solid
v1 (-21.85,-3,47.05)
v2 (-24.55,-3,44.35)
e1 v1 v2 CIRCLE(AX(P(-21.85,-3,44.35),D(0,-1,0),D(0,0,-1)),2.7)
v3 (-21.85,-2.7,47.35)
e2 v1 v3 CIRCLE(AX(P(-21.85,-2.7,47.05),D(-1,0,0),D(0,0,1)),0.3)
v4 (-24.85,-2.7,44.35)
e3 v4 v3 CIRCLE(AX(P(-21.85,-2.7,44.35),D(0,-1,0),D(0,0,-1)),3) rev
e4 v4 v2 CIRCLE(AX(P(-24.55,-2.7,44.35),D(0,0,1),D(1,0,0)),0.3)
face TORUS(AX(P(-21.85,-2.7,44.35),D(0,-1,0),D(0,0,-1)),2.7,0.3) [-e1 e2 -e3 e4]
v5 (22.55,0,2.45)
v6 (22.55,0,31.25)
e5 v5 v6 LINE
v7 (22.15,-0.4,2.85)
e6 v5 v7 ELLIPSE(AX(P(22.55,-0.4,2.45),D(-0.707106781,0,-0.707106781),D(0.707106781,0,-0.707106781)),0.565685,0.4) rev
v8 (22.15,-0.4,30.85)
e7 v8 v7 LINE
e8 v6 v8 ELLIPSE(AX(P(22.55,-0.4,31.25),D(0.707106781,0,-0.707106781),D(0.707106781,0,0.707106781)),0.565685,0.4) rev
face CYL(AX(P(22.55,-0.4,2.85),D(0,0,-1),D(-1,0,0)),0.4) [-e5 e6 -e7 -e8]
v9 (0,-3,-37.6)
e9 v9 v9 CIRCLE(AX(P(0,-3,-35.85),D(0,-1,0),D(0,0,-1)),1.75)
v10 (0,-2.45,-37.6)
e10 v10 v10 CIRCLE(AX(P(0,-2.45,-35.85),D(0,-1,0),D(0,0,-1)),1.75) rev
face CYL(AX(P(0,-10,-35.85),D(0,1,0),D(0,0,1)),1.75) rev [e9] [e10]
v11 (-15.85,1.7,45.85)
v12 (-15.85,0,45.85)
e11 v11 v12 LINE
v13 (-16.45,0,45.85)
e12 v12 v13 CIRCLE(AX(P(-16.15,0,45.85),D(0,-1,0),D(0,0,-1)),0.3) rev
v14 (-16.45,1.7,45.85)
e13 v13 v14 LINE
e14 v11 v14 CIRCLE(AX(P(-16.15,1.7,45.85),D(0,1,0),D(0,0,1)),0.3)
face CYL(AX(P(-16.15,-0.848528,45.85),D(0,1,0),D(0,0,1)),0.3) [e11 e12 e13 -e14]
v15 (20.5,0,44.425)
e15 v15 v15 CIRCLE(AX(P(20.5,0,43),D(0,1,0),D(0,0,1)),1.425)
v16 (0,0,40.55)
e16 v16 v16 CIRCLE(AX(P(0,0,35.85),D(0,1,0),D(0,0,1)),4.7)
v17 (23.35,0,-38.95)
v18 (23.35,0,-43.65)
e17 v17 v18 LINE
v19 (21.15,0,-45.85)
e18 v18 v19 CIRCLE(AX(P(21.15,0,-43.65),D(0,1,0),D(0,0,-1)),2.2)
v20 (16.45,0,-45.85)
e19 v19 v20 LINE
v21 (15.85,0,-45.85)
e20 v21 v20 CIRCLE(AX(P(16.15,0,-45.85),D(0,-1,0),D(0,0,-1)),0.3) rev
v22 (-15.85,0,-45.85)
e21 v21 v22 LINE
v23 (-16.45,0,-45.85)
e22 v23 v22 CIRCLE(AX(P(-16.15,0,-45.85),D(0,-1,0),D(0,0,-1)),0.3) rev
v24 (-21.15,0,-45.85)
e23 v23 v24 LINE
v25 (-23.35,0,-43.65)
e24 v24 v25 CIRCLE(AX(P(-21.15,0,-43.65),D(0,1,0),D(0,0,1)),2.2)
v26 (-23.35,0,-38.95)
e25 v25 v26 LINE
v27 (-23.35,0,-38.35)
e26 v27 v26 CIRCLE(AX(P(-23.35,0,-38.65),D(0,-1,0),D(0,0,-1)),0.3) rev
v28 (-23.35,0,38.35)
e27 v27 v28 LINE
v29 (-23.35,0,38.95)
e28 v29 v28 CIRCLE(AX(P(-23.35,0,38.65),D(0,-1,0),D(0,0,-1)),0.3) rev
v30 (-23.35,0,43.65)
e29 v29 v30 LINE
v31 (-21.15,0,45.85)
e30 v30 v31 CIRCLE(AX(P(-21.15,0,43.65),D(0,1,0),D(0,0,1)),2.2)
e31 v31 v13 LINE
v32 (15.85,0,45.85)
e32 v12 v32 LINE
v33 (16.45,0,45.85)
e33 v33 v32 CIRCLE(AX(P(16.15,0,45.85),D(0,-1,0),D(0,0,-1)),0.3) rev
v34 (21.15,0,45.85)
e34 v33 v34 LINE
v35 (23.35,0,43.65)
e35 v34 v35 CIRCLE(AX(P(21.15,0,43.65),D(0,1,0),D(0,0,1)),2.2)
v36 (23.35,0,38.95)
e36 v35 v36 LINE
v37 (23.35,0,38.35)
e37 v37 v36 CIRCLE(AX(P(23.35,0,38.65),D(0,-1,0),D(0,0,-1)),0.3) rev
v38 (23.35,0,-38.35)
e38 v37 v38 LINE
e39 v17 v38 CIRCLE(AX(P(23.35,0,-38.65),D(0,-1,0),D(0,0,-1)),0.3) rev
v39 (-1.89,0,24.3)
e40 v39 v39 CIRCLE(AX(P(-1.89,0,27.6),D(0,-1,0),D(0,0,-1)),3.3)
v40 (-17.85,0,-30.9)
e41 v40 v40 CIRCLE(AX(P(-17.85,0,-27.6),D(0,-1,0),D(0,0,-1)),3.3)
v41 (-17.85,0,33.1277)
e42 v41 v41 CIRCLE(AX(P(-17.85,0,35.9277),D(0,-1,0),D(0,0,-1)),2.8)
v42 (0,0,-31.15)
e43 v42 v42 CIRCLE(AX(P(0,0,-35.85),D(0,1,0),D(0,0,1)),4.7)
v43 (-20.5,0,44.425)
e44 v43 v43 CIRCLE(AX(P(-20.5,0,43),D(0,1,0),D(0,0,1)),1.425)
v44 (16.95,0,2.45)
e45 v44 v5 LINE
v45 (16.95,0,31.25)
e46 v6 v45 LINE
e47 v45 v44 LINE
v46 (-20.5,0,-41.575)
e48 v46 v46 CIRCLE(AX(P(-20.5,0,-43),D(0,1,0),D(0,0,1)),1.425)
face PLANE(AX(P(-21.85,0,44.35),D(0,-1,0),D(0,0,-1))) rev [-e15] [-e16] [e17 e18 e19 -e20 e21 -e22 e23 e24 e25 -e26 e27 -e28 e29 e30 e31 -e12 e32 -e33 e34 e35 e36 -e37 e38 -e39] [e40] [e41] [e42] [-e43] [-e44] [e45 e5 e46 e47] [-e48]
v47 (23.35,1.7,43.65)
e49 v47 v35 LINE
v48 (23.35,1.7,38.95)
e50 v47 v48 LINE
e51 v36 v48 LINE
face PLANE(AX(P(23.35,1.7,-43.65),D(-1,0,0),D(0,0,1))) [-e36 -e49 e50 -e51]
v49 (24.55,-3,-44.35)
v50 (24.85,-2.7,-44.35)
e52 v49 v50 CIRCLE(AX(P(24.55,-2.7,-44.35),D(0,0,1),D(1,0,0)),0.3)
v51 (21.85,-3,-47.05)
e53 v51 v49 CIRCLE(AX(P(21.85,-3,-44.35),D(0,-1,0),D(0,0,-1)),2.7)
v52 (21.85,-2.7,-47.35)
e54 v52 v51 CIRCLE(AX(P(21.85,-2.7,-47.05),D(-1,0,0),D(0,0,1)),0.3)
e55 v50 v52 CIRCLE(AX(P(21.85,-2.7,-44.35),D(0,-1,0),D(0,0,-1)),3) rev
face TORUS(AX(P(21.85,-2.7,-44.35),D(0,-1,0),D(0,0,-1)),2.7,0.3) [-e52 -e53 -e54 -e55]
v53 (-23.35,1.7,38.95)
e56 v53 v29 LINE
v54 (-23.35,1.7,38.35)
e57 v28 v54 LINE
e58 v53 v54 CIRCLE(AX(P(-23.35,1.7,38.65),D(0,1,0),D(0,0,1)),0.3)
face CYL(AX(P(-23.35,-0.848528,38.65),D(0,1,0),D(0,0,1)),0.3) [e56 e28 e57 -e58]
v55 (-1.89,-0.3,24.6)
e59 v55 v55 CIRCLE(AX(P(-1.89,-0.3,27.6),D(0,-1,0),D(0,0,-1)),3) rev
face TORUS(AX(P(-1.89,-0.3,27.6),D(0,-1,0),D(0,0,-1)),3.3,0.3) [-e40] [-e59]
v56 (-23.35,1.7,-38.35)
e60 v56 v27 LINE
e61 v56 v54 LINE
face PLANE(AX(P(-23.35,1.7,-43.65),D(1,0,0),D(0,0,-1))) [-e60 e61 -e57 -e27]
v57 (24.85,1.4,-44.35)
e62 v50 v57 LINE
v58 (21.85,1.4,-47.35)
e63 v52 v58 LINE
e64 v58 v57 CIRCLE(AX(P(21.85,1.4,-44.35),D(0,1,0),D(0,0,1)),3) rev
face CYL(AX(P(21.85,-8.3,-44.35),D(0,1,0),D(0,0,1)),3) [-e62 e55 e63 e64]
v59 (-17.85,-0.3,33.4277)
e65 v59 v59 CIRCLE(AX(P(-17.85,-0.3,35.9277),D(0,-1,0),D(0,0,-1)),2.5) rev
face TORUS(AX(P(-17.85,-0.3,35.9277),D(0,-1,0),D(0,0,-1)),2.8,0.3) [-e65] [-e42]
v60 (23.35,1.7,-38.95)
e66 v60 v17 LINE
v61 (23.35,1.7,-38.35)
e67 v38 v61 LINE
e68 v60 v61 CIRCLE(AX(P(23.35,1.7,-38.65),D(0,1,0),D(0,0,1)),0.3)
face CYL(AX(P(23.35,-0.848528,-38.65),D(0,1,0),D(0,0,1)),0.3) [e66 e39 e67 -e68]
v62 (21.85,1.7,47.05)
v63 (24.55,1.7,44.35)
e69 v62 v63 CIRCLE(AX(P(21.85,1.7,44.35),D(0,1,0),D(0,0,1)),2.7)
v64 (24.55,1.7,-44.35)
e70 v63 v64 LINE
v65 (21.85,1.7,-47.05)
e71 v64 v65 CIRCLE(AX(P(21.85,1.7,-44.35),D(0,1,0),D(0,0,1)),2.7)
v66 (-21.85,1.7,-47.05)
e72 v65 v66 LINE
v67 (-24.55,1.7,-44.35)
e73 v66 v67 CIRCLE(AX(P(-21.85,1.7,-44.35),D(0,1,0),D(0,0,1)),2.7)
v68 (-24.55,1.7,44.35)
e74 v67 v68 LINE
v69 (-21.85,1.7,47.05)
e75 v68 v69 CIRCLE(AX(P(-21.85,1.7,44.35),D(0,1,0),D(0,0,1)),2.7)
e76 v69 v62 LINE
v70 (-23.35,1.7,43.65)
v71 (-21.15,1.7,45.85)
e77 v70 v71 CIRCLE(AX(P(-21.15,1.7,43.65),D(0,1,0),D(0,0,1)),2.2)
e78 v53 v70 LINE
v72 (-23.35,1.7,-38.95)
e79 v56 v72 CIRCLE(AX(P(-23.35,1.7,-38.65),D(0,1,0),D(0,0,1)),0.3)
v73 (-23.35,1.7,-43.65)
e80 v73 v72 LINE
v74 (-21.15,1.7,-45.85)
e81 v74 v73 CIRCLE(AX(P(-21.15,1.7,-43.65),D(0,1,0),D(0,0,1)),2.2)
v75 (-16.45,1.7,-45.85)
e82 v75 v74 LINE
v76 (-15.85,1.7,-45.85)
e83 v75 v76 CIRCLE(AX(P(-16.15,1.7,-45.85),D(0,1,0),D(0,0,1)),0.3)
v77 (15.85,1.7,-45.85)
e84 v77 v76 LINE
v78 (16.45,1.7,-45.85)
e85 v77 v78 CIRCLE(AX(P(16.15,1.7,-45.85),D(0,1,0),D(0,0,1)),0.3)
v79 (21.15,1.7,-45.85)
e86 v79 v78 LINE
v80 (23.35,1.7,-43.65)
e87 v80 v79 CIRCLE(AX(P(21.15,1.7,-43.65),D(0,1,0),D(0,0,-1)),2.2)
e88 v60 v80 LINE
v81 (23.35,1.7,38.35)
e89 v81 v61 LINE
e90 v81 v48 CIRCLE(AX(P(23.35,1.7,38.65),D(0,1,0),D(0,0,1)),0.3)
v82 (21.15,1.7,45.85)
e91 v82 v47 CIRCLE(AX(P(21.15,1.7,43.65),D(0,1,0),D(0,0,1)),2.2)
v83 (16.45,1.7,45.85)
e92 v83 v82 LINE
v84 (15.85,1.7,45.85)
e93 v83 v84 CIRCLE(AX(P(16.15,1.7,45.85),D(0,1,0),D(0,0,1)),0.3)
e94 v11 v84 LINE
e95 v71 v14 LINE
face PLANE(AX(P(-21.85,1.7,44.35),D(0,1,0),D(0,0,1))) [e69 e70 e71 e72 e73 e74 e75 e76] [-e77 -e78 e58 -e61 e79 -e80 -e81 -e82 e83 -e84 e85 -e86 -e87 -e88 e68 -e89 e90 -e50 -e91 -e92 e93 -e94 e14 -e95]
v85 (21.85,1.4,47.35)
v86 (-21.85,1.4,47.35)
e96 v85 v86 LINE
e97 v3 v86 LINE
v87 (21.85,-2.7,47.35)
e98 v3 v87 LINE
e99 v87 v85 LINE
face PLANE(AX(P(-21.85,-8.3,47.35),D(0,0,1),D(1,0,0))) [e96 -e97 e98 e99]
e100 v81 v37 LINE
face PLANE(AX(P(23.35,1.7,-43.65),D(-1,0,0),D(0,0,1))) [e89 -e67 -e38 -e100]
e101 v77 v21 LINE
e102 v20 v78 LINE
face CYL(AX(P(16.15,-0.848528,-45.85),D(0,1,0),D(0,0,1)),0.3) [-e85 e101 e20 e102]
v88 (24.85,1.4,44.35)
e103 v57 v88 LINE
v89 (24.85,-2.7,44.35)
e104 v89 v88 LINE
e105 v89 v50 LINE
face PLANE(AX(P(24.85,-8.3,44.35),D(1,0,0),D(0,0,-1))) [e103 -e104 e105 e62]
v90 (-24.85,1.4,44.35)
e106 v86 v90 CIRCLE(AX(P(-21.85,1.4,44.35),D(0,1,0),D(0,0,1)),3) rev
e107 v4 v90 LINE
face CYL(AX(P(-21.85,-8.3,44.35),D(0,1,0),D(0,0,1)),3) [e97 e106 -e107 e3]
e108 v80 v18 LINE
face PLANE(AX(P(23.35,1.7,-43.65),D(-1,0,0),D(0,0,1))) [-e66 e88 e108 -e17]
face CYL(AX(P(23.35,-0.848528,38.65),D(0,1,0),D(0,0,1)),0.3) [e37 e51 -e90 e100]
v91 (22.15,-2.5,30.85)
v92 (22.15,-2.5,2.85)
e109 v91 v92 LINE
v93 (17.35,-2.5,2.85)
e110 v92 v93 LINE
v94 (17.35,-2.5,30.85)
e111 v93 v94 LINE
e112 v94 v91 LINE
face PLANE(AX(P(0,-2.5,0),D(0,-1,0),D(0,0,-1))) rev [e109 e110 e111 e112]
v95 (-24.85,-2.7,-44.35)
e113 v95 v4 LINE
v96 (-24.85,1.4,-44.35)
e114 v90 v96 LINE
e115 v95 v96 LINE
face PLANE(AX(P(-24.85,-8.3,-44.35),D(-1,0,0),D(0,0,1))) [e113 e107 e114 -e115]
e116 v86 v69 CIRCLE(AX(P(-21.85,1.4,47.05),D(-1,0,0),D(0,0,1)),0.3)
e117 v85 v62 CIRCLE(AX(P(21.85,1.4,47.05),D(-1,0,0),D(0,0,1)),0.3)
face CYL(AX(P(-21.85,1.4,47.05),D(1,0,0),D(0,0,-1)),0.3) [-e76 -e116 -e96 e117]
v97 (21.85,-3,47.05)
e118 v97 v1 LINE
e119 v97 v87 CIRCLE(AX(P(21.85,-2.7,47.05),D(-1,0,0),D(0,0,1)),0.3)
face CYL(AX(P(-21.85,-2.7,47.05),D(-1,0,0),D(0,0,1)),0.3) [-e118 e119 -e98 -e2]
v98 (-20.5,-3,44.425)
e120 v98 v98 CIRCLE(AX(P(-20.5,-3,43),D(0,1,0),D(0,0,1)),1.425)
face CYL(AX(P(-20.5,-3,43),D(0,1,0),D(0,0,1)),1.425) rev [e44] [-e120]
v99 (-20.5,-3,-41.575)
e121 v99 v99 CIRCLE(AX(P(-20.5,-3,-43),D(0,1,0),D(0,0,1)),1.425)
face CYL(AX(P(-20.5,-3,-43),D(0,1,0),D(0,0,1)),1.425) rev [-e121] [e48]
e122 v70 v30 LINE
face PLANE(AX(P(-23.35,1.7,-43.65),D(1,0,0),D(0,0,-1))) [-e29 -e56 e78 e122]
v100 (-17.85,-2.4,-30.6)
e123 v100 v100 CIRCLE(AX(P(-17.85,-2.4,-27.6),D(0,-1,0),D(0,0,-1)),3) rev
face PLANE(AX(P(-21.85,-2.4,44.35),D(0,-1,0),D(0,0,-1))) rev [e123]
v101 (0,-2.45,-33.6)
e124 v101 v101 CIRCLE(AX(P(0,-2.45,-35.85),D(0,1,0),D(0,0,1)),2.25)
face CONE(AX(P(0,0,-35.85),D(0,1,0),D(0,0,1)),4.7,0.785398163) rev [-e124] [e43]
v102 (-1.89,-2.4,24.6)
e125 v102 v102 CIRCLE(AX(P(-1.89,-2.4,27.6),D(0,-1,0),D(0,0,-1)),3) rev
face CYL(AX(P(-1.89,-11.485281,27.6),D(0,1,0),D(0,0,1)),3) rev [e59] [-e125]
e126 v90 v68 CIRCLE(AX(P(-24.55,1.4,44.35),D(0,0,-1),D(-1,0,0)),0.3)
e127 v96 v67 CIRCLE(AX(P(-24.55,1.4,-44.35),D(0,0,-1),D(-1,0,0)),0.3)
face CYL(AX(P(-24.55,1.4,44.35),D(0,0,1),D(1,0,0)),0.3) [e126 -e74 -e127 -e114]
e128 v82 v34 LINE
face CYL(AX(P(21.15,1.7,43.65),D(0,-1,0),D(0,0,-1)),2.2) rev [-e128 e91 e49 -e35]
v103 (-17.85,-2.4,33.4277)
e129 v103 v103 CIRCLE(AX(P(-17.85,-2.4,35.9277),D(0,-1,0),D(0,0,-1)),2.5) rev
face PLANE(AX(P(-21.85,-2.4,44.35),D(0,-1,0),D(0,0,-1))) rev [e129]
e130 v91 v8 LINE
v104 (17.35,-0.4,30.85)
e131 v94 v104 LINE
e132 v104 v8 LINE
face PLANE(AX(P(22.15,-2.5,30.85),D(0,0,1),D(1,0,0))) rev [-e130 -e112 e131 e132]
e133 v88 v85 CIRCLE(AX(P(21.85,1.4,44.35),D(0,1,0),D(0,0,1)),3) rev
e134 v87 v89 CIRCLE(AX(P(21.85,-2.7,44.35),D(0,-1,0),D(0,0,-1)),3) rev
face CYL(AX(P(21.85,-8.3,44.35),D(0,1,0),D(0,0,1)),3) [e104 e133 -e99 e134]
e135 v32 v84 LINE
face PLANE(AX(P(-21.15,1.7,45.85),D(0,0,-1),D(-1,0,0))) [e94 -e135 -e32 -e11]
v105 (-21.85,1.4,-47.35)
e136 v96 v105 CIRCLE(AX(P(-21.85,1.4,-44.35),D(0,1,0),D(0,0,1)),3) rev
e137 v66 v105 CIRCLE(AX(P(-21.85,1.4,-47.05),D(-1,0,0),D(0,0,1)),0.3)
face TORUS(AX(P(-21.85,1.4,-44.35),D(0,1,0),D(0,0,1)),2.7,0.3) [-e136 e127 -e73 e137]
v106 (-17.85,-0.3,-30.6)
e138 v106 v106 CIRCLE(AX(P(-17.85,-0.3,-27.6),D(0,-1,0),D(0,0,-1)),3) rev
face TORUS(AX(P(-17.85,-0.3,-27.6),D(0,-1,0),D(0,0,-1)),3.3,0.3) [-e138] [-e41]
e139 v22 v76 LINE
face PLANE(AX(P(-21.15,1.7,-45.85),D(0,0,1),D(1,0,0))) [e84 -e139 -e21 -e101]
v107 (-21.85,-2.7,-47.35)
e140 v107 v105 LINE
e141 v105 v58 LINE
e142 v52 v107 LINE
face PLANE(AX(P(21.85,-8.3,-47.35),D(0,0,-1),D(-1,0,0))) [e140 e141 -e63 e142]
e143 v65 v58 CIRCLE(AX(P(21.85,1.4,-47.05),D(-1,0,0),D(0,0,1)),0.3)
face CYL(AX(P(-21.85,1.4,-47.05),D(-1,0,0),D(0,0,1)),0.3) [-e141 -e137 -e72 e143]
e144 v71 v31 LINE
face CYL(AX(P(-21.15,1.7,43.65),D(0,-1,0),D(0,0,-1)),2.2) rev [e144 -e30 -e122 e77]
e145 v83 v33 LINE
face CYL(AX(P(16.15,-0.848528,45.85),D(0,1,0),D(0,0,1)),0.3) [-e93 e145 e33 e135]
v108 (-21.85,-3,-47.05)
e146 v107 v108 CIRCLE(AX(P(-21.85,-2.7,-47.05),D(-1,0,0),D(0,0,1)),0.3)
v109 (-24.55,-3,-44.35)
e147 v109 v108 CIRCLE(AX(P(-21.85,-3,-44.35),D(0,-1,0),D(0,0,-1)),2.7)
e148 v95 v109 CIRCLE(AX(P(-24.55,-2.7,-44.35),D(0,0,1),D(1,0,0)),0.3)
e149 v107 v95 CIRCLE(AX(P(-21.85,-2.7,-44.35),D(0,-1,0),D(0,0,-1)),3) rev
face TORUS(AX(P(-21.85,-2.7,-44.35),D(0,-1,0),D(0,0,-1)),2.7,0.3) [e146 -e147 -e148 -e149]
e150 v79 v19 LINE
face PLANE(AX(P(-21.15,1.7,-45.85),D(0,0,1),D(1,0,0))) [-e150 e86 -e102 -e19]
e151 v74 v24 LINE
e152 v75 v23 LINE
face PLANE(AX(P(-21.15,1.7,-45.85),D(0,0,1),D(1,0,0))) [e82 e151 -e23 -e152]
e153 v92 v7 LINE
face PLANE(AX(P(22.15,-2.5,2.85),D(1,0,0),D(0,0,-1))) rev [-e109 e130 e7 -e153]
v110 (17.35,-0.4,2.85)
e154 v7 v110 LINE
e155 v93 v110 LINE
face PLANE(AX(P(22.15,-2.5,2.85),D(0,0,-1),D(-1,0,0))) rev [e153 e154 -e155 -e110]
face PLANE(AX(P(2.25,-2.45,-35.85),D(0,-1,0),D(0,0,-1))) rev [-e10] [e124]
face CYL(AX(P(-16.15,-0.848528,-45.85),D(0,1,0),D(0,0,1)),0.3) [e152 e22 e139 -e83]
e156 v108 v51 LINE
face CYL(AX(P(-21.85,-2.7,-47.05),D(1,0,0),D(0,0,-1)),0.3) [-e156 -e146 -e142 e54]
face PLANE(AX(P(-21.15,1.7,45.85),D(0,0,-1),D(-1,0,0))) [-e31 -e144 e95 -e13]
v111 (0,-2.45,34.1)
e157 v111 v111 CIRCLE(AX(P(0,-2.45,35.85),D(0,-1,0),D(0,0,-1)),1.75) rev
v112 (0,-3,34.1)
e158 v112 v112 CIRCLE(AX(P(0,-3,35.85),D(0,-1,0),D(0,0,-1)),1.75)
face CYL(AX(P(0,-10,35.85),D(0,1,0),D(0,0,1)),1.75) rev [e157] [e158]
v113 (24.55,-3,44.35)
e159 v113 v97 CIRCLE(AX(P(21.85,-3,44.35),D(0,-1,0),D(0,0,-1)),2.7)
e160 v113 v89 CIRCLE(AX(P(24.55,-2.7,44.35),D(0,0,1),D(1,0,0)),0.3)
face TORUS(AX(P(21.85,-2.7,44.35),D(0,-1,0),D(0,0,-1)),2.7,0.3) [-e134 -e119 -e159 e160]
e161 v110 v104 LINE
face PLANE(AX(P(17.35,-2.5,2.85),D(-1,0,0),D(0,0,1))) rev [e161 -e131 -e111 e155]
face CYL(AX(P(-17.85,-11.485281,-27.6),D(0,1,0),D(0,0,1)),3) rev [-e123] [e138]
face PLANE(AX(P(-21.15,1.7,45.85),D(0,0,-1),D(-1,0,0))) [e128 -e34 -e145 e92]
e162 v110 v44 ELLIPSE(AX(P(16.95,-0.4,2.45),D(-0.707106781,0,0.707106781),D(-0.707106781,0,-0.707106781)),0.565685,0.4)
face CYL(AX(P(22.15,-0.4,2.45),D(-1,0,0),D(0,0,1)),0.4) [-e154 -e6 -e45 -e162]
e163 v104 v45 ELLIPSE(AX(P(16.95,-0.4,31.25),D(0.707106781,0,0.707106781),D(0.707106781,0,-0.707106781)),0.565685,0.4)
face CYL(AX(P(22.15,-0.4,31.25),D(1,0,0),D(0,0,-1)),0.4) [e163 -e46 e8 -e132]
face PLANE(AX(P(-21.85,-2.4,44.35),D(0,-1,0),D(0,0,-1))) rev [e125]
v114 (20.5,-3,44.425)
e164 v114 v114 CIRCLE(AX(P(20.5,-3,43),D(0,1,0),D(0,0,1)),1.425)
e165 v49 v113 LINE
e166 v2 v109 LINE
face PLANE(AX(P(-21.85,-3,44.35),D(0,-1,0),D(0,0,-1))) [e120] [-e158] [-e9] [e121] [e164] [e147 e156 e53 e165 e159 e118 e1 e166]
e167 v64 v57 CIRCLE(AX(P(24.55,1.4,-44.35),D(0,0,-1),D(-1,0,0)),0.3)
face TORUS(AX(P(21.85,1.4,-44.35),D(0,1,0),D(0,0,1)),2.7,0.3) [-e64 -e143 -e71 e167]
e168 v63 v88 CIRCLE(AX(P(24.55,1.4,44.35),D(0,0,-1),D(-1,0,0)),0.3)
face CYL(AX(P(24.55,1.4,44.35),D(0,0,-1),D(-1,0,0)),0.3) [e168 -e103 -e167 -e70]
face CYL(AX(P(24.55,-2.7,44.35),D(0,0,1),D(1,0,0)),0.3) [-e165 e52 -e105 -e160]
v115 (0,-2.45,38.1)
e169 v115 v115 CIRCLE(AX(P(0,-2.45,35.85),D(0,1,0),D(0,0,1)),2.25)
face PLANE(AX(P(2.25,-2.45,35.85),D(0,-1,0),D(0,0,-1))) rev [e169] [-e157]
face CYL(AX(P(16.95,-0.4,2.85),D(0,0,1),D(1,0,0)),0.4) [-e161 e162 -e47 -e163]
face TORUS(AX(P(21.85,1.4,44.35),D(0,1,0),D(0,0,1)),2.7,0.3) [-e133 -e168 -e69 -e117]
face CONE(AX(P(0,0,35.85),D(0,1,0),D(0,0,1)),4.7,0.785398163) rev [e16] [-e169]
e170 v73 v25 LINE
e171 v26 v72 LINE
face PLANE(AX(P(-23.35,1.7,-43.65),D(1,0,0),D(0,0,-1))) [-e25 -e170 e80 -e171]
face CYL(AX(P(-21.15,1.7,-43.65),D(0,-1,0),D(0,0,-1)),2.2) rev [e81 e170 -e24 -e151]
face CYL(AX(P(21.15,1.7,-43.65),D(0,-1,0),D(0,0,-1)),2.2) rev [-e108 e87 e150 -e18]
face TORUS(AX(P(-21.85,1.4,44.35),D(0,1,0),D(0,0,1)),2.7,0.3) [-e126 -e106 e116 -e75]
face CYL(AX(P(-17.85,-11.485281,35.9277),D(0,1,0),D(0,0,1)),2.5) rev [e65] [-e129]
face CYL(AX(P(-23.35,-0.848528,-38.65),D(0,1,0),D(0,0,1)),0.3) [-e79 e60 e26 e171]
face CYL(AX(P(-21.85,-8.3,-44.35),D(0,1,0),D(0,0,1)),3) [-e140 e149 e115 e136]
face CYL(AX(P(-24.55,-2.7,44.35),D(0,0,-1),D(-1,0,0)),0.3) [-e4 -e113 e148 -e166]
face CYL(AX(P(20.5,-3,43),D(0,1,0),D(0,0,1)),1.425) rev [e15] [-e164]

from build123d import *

# Parameters (mm, degrees)
BOSS_EXTRUDE1_DEPTH         = 1.7
BOSS_EXTRUDE2_START         = 3
BOSS_EXTRUDE2_DEPTH         = 3
SKETCH8_W                   = 4.8
SKETCH8_H                   = 28
CUT_EXTRUDE1_DEPTH          = 2.5
FILLET4_R                   = 0.2
FILLET5_R                   = 0.4
SKETCH9_W                   = 86.507832479
SKETCH9_H                   = 115.776512498
CUT_EXTRUDE2_DEPTH          = 10
SKETCH10_R                  = 1.425
CUT_EXTRUDE3_DEPTH          = 54.558799464
SKETCH11_R                  = 1.75
CUT_EXTRUDE4_DEPTH          = 10
ADVANCEDHOLE2_OUTLINE_R     = 2.25
ADVANCEDHOLE2_OUTLINE_R_2   = 1.75
ADVANCEDHOLE2_DEPTH         = 2.45
ADVANCEDHOLE2_DRAFT         = -45
ADVANCEDHOLE2_2_OUTLINE_R   = 2.25
ADVANCEDHOLE2_2_OUTLINE_R_2 = 1.75
ADVANCEDHOLE2_2_DEPTH       = 2.45
ADVANCEDHOLE2_2_DRAFT       = -45
SKETCH15_R                  = 0.3
BOSS_EXTRUDE3_DEPTH         = 1.7
FILLET6_R                   = 0.3
SKETCH16_R                  = 3
SKETCH16_R_2                = 2.5
CUT_EXTRUDE5_DEPTH          = 2.4
FILLET7_R                   = 0.3


# Read off the part's stored shape, not the designer's step: AdvancedHole2
with BuildPart() as part:
    # Sketch1 → Boss-Extrude1 (new body)
    with BuildSketch(Plane(origin=(0, 0, 0), x_dir=(1, 0, 0), z_dir=(0, 1, 0))):
        with BuildLine():
            Line((-21.85, 48.35), (21.85, 48.35))
            ThreePointArc((21.85, 48.35), (24.678427125, 47.178427125), (25.85, 44.35))
            Line((25.85, 44.35), (25.85, -44.35))
            ThreePointArc((25.85, -44.35), (24.678427125, -47.178427125), (21.85, -48.35))
            Line((21.85, -48.35), (-21.85, -48.35))
            ThreePointArc((-21.85, -48.35), (-24.678427125, -47.178427125), (-25.85, -44.35))
            Line((-25.85, -44.35), (-25.85, 44.35))
            ThreePointArc((-25.85, 44.35), (-24.678427125, 47.178427125), (-21.85, 48.35))
        make_face()
        with BuildLine():
            Line((-21.15, 45.85), (21.15, 45.85))
            ThreePointArc((21.15, 45.85), (22.705634919, 45.205634919), (23.35, 43.65))
            Line((23.35, 43.65), (23.35, -43.65))
            ThreePointArc((23.35, -43.65), (22.705634919, -45.205634919), (21.15, -45.85))
            Line((21.15, -45.85), (-21.15, -45.85))
            ThreePointArc((-21.15, -45.85), (-22.705634919, -45.205634919), (-23.35, -43.65))
            Line((-23.35, -43.65), (-23.35, 43.65))
            ThreePointArc((-23.35, 43.65), (-22.705634919, 45.205634919), (-21.15, 45.85))
        make_face(mode=Mode.SUBTRACT)
    extrude(amount=BOSS_EXTRUDE1_DEPTH)

    # Sketch2 → Boss-Extrude2 (add)
    with BuildSketch(Plane.XZ.offset(BOSS_EXTRUDE2_START)):
        with BuildLine():
            Line((-25.85, 44.35), (-25.85, -44.35))
            ThreePointArc((-25.85, -44.35), (-24.678427125, -47.178427125), (-21.85, -48.35))
            Line((-21.85, -48.35), (21.85, -48.35))
            ThreePointArc((21.85, -48.35), (24.678427125, -47.178427125), (25.85, -44.35))
            Line((25.85, -44.35), (25.85, 44.35))
            ThreePointArc((25.85, 44.35), (24.678427125, 47.178427125), (21.85, 48.35))
            Line((21.85, 48.35), (-21.85, 48.35))
            ThreePointArc((-21.85, 48.35), (-24.678427125, 47.178427125), (-25.85, 44.35))
        make_face()
    extrude(amount=-BOSS_EXTRUDE2_DEPTH)

    # Sketch8 → Cut-Extrude1 (cut)
    with BuildSketch(Plane(origin=(0, 0, 0), x_dir=(1, 0, 0), z_dir=(0, 1, 0))):
        with Locations((19.75, -16.85)):
            Rectangle(SKETCH8_W, SKETCH8_H)
    extrude(amount=-CUT_EXTRUDE1_DEPTH, mode=Mode.SUBTRACT)

    # Fillet4
    fillet4_edges = [part.edges().sort_by_distance(p)[0] for p in [
        (-24.678427125, -3, 47.178427125),
        (-25.85, -3, 0),
        (-24.678427125, -3, -47.178427125),
        (0, -3, -48.35),
        (24.678427125, -3, -47.178427125),
        (25.85, -3, 0),
        (24.678427125, -3, 47.178427125),
        (0, -3, 48.35),
    ]]
    fillet(fillet4_edges, radius=FILLET4_R)

    # Fillet5
    fillet5_edges = [part.edges().sort_by_distance(p)[0] for p in [
        (22.15, 0, 16.85),
        (19.75, 0, 2.85),
        (17.35, 0, 16.85),
        (19.75, 0, 30.85),
    ]]
    fillet(fillet5_edges, radius=FILLET5_R)

    # Sketch9 → Cut-Extrude2 (cut)
    with BuildSketch(Plane(origin=(0, 1.7, 0), x_dir=(1, 0, 0), z_dir=(0, 1, 0))):
        with Locations((1.136314031, 0.63119656)):
            Rectangle(SKETCH9_W, SKETCH9_H)
        with BuildLine():
            Line((-21.85, -47.35), (21.85, -47.35))
            ThreePointArc((21.85, -47.35), (23.971320344, -46.471320344), (24.85, -44.35))
            Line((24.85, -44.35), (24.85, 44.35))
            ThreePointArc((24.85, 44.35), (23.971320344, 46.471320344), (21.85, 47.35))
            Line((21.85, 47.35), (-21.85, 47.35))
            ThreePointArc((-21.85, 47.35), (-23.971320344, 46.471320344), (-24.85, 44.35))
            Line((-24.85, 44.35), (-24.85, -44.35))
            ThreePointArc((-24.85, -44.35), (-23.971320344, -46.471320344), (-21.85, -47.35))
        make_face(mode=Mode.SUBTRACT)
    extrude(amount=-CUT_EXTRUDE2_DEPTH, mode=Mode.SUBTRACT)

    # Sketch10 → Cut-Extrude3 (cut, through all)
    with BuildSketch(Plane(origin=(0, 0, 0), x_dir=(1, 0, 0), z_dir=(0, 1, 0))):
        with Locations(Location((-20.5, 43, 0), (0, 0, 270))):
            Circle(SKETCH10_R)
        with Locations(Location((-20.5, -43, 0), (0, 0, 270))):
            Circle(SKETCH10_R)
        with Locations(Location((20.5, -43, 0), (0, 0, 270))):
            Circle(SKETCH10_R)
    extrude(amount=-CUT_EXTRUDE3_DEPTH, mode=Mode.SUBTRACT)

    # Sketch11 → Cut-Extrude4 (cut)
    with BuildSketch(Plane(origin=(0, 0, 0), x_dir=(1, 0, 0), z_dir=(0, 1, 0))):
        with Locations(Location((0, 35.85, 0), (0, 0, 270))):
            Circle(SKETCH11_R)
        with Locations(Location((0, -35.85, 0), (0, 0, 270))):
            Circle(SKETCH11_R)
    extrude(amount=-CUT_EXTRUDE4_DEPTH, mode=Mode.SUBTRACT)


with BuildPart() as advancedhole2_tool:
    # AdvancedHole2 outline → AdvancedHole2 (with draft: the straight prism first)
    with BuildSketch(Plane(origin=(0, -2.45, 0), x_dir=(1, 0, 0), z_dir=(0, 1, 0))):
        with Locations((0, -35.85)):
            Circle(ADVANCEDHOLE2_OUTLINE_R)
        with Locations((0, -35.85)):
            Circle(ADVANCEDHOLE2_OUTLINE_R_2, mode=Mode.SUBTRACT)
    extrude(amount=ADVANCEDHOLE2_DEPTH)
    # AdvancedHole2: the draft: its side faces are tilted about the plane it starts from
    advancedhole2_sides = [advancedhole2_tool.faces().sort_by_distance(p)[0] for p in [
        (-2.25, -1.225, 35.85),
        (-1.75, -1.225, 35.85),
    ]]
    draft(advancedhole2_sides, Plane(origin=(0, -2.45, 0), x_dir=(1, 0, 0), z_dir=(0, 1, 0)), ADVANCEDHOLE2_DRAFT)


with BuildPart() as part_1:
    add(part.part)

    # AdvancedHole2: cut by advancedhole2_tool
    add(advancedhole2_tool.part, mode=Mode.SUBTRACT)


with BuildPart() as advancedhole2_2_tool:
    # AdvancedHole2 2 outline → AdvancedHole2 2 (with draft: the straight prism first)
    with BuildSketch(Plane(origin=(0, -2.45, 0), x_dir=(1, 0, 0), z_dir=(0, 1, 0))):
        with Locations((0, 35.85)):
            Circle(ADVANCEDHOLE2_2_OUTLINE_R)
        with Locations((0, 35.85)):
            Circle(ADVANCEDHOLE2_2_OUTLINE_R_2, mode=Mode.SUBTRACT)
    extrude(amount=ADVANCEDHOLE2_2_DEPTH)
    # AdvancedHole2 2: the draft: its side faces are tilted about the plane it starts from
    advancedhole2_2_sides = [advancedhole2_2_tool.faces().sort_by_distance(p)[0] for p in [
        (-2.25, -1.225, -35.85),
        (-1.75, -1.225, -35.85),
    ]]
    draft(advancedhole2_2_sides, Plane(origin=(0, -2.45, 0), x_dir=(1, 0, 0), z_dir=(0, 1, 0)), ADVANCEDHOLE2_2_DRAFT)


with BuildPart() as part_2:
    add(part_1.part)

    # AdvancedHole2 2: cut by advancedhole2_2_tool
    add(advancedhole2_2_tool.part, mode=Mode.SUBTRACT)

    # Sketch15 → Boss-Extrude3 (add)
    with BuildSketch(Plane(origin=(0, 1.7, 0), x_dir=(1, 0, 0), z_dir=(0, 1, 0))):
        with Locations((-23.35, -38.65)):
            Circle(SKETCH15_R)
        with Locations((-16.15, -45.85)):
            Circle(SKETCH15_R)
        with Locations((16.15, -45.85)):
            Circle(SKETCH15_R)
        with Locations((23.35, -38.65)):
            Circle(SKETCH15_R)
        with Locations((-23.35, 38.65)):
            Circle(SKETCH15_R)
        with Locations((-16.15, 45.85)):
            Circle(SKETCH15_R)
        with Locations((16.15, 45.85)):
            Circle(SKETCH15_R)
        with Locations((23.35, 38.65)):
            Circle(SKETCH15_R)
    extrude(amount=-BOSS_EXTRUDE3_DEPTH)

    # Fillet6
    fillet6_edges = [part_2.edges().sort_by_distance(p)[0] for p in [
        (0, -3, 47.35),
        (23.971320344, -3, 46.471320344),
        (24.85, -3, 0),
        (23.971320344, -3, -46.471320344),
        (0, -3, -47.35),
        (-23.971320344, -3, -46.471320344),
        (-24.85, -3, 0),
        (-23.971320344, -3, 46.471320344),
        (-23.971320344, 1.7, 46.471320344),
        (-24.85, 1.7, 0),
        (-23.971320344, 1.7, -46.471320344),
        (0, 1.7, -47.35),
        (23.971320344, 1.7, -46.471320344),
        (24.85, 1.7, 0),
        (23.971320344, 1.7, 46.471320344),
        (0, 1.7, 47.35),
    ]]
    fillet(fillet6_edges, radius=FILLET6_R)

    # Sketch16 → Cut-Extrude5 (cut)
    with BuildSketch(Plane(origin=(0, 0, 0), x_dir=(1, 0, 0), z_dir=(0, 1, 0))):
        with Locations(Location((-17.85, 27.6, 0), (0, 0, 270))):
            Circle(SKETCH16_R)
        with Locations(Location((-17.85, -35.9277, 0), (0, 0, 270))):
            Circle(SKETCH16_R_2)
        with Locations(Location((-1.89, -27.6, 0), (0, 0, 270))):
            Circle(SKETCH16_R)
    extrude(amount=-CUT_EXTRUDE5_DEPTH, mode=Mode.SUBTRACT)

    # Fillet7
    fillet7_edges = [part_2.edges().sort_by_distance(p)[0] for p in [
        (-17.85, 0, -30.6),
        (-17.85, 0, 33.4277),
        (-1.89, 0, 24.6),
    ]]
    fillet(fillet7_edges, radius=FILLET7_R)


solid = part_2.part
